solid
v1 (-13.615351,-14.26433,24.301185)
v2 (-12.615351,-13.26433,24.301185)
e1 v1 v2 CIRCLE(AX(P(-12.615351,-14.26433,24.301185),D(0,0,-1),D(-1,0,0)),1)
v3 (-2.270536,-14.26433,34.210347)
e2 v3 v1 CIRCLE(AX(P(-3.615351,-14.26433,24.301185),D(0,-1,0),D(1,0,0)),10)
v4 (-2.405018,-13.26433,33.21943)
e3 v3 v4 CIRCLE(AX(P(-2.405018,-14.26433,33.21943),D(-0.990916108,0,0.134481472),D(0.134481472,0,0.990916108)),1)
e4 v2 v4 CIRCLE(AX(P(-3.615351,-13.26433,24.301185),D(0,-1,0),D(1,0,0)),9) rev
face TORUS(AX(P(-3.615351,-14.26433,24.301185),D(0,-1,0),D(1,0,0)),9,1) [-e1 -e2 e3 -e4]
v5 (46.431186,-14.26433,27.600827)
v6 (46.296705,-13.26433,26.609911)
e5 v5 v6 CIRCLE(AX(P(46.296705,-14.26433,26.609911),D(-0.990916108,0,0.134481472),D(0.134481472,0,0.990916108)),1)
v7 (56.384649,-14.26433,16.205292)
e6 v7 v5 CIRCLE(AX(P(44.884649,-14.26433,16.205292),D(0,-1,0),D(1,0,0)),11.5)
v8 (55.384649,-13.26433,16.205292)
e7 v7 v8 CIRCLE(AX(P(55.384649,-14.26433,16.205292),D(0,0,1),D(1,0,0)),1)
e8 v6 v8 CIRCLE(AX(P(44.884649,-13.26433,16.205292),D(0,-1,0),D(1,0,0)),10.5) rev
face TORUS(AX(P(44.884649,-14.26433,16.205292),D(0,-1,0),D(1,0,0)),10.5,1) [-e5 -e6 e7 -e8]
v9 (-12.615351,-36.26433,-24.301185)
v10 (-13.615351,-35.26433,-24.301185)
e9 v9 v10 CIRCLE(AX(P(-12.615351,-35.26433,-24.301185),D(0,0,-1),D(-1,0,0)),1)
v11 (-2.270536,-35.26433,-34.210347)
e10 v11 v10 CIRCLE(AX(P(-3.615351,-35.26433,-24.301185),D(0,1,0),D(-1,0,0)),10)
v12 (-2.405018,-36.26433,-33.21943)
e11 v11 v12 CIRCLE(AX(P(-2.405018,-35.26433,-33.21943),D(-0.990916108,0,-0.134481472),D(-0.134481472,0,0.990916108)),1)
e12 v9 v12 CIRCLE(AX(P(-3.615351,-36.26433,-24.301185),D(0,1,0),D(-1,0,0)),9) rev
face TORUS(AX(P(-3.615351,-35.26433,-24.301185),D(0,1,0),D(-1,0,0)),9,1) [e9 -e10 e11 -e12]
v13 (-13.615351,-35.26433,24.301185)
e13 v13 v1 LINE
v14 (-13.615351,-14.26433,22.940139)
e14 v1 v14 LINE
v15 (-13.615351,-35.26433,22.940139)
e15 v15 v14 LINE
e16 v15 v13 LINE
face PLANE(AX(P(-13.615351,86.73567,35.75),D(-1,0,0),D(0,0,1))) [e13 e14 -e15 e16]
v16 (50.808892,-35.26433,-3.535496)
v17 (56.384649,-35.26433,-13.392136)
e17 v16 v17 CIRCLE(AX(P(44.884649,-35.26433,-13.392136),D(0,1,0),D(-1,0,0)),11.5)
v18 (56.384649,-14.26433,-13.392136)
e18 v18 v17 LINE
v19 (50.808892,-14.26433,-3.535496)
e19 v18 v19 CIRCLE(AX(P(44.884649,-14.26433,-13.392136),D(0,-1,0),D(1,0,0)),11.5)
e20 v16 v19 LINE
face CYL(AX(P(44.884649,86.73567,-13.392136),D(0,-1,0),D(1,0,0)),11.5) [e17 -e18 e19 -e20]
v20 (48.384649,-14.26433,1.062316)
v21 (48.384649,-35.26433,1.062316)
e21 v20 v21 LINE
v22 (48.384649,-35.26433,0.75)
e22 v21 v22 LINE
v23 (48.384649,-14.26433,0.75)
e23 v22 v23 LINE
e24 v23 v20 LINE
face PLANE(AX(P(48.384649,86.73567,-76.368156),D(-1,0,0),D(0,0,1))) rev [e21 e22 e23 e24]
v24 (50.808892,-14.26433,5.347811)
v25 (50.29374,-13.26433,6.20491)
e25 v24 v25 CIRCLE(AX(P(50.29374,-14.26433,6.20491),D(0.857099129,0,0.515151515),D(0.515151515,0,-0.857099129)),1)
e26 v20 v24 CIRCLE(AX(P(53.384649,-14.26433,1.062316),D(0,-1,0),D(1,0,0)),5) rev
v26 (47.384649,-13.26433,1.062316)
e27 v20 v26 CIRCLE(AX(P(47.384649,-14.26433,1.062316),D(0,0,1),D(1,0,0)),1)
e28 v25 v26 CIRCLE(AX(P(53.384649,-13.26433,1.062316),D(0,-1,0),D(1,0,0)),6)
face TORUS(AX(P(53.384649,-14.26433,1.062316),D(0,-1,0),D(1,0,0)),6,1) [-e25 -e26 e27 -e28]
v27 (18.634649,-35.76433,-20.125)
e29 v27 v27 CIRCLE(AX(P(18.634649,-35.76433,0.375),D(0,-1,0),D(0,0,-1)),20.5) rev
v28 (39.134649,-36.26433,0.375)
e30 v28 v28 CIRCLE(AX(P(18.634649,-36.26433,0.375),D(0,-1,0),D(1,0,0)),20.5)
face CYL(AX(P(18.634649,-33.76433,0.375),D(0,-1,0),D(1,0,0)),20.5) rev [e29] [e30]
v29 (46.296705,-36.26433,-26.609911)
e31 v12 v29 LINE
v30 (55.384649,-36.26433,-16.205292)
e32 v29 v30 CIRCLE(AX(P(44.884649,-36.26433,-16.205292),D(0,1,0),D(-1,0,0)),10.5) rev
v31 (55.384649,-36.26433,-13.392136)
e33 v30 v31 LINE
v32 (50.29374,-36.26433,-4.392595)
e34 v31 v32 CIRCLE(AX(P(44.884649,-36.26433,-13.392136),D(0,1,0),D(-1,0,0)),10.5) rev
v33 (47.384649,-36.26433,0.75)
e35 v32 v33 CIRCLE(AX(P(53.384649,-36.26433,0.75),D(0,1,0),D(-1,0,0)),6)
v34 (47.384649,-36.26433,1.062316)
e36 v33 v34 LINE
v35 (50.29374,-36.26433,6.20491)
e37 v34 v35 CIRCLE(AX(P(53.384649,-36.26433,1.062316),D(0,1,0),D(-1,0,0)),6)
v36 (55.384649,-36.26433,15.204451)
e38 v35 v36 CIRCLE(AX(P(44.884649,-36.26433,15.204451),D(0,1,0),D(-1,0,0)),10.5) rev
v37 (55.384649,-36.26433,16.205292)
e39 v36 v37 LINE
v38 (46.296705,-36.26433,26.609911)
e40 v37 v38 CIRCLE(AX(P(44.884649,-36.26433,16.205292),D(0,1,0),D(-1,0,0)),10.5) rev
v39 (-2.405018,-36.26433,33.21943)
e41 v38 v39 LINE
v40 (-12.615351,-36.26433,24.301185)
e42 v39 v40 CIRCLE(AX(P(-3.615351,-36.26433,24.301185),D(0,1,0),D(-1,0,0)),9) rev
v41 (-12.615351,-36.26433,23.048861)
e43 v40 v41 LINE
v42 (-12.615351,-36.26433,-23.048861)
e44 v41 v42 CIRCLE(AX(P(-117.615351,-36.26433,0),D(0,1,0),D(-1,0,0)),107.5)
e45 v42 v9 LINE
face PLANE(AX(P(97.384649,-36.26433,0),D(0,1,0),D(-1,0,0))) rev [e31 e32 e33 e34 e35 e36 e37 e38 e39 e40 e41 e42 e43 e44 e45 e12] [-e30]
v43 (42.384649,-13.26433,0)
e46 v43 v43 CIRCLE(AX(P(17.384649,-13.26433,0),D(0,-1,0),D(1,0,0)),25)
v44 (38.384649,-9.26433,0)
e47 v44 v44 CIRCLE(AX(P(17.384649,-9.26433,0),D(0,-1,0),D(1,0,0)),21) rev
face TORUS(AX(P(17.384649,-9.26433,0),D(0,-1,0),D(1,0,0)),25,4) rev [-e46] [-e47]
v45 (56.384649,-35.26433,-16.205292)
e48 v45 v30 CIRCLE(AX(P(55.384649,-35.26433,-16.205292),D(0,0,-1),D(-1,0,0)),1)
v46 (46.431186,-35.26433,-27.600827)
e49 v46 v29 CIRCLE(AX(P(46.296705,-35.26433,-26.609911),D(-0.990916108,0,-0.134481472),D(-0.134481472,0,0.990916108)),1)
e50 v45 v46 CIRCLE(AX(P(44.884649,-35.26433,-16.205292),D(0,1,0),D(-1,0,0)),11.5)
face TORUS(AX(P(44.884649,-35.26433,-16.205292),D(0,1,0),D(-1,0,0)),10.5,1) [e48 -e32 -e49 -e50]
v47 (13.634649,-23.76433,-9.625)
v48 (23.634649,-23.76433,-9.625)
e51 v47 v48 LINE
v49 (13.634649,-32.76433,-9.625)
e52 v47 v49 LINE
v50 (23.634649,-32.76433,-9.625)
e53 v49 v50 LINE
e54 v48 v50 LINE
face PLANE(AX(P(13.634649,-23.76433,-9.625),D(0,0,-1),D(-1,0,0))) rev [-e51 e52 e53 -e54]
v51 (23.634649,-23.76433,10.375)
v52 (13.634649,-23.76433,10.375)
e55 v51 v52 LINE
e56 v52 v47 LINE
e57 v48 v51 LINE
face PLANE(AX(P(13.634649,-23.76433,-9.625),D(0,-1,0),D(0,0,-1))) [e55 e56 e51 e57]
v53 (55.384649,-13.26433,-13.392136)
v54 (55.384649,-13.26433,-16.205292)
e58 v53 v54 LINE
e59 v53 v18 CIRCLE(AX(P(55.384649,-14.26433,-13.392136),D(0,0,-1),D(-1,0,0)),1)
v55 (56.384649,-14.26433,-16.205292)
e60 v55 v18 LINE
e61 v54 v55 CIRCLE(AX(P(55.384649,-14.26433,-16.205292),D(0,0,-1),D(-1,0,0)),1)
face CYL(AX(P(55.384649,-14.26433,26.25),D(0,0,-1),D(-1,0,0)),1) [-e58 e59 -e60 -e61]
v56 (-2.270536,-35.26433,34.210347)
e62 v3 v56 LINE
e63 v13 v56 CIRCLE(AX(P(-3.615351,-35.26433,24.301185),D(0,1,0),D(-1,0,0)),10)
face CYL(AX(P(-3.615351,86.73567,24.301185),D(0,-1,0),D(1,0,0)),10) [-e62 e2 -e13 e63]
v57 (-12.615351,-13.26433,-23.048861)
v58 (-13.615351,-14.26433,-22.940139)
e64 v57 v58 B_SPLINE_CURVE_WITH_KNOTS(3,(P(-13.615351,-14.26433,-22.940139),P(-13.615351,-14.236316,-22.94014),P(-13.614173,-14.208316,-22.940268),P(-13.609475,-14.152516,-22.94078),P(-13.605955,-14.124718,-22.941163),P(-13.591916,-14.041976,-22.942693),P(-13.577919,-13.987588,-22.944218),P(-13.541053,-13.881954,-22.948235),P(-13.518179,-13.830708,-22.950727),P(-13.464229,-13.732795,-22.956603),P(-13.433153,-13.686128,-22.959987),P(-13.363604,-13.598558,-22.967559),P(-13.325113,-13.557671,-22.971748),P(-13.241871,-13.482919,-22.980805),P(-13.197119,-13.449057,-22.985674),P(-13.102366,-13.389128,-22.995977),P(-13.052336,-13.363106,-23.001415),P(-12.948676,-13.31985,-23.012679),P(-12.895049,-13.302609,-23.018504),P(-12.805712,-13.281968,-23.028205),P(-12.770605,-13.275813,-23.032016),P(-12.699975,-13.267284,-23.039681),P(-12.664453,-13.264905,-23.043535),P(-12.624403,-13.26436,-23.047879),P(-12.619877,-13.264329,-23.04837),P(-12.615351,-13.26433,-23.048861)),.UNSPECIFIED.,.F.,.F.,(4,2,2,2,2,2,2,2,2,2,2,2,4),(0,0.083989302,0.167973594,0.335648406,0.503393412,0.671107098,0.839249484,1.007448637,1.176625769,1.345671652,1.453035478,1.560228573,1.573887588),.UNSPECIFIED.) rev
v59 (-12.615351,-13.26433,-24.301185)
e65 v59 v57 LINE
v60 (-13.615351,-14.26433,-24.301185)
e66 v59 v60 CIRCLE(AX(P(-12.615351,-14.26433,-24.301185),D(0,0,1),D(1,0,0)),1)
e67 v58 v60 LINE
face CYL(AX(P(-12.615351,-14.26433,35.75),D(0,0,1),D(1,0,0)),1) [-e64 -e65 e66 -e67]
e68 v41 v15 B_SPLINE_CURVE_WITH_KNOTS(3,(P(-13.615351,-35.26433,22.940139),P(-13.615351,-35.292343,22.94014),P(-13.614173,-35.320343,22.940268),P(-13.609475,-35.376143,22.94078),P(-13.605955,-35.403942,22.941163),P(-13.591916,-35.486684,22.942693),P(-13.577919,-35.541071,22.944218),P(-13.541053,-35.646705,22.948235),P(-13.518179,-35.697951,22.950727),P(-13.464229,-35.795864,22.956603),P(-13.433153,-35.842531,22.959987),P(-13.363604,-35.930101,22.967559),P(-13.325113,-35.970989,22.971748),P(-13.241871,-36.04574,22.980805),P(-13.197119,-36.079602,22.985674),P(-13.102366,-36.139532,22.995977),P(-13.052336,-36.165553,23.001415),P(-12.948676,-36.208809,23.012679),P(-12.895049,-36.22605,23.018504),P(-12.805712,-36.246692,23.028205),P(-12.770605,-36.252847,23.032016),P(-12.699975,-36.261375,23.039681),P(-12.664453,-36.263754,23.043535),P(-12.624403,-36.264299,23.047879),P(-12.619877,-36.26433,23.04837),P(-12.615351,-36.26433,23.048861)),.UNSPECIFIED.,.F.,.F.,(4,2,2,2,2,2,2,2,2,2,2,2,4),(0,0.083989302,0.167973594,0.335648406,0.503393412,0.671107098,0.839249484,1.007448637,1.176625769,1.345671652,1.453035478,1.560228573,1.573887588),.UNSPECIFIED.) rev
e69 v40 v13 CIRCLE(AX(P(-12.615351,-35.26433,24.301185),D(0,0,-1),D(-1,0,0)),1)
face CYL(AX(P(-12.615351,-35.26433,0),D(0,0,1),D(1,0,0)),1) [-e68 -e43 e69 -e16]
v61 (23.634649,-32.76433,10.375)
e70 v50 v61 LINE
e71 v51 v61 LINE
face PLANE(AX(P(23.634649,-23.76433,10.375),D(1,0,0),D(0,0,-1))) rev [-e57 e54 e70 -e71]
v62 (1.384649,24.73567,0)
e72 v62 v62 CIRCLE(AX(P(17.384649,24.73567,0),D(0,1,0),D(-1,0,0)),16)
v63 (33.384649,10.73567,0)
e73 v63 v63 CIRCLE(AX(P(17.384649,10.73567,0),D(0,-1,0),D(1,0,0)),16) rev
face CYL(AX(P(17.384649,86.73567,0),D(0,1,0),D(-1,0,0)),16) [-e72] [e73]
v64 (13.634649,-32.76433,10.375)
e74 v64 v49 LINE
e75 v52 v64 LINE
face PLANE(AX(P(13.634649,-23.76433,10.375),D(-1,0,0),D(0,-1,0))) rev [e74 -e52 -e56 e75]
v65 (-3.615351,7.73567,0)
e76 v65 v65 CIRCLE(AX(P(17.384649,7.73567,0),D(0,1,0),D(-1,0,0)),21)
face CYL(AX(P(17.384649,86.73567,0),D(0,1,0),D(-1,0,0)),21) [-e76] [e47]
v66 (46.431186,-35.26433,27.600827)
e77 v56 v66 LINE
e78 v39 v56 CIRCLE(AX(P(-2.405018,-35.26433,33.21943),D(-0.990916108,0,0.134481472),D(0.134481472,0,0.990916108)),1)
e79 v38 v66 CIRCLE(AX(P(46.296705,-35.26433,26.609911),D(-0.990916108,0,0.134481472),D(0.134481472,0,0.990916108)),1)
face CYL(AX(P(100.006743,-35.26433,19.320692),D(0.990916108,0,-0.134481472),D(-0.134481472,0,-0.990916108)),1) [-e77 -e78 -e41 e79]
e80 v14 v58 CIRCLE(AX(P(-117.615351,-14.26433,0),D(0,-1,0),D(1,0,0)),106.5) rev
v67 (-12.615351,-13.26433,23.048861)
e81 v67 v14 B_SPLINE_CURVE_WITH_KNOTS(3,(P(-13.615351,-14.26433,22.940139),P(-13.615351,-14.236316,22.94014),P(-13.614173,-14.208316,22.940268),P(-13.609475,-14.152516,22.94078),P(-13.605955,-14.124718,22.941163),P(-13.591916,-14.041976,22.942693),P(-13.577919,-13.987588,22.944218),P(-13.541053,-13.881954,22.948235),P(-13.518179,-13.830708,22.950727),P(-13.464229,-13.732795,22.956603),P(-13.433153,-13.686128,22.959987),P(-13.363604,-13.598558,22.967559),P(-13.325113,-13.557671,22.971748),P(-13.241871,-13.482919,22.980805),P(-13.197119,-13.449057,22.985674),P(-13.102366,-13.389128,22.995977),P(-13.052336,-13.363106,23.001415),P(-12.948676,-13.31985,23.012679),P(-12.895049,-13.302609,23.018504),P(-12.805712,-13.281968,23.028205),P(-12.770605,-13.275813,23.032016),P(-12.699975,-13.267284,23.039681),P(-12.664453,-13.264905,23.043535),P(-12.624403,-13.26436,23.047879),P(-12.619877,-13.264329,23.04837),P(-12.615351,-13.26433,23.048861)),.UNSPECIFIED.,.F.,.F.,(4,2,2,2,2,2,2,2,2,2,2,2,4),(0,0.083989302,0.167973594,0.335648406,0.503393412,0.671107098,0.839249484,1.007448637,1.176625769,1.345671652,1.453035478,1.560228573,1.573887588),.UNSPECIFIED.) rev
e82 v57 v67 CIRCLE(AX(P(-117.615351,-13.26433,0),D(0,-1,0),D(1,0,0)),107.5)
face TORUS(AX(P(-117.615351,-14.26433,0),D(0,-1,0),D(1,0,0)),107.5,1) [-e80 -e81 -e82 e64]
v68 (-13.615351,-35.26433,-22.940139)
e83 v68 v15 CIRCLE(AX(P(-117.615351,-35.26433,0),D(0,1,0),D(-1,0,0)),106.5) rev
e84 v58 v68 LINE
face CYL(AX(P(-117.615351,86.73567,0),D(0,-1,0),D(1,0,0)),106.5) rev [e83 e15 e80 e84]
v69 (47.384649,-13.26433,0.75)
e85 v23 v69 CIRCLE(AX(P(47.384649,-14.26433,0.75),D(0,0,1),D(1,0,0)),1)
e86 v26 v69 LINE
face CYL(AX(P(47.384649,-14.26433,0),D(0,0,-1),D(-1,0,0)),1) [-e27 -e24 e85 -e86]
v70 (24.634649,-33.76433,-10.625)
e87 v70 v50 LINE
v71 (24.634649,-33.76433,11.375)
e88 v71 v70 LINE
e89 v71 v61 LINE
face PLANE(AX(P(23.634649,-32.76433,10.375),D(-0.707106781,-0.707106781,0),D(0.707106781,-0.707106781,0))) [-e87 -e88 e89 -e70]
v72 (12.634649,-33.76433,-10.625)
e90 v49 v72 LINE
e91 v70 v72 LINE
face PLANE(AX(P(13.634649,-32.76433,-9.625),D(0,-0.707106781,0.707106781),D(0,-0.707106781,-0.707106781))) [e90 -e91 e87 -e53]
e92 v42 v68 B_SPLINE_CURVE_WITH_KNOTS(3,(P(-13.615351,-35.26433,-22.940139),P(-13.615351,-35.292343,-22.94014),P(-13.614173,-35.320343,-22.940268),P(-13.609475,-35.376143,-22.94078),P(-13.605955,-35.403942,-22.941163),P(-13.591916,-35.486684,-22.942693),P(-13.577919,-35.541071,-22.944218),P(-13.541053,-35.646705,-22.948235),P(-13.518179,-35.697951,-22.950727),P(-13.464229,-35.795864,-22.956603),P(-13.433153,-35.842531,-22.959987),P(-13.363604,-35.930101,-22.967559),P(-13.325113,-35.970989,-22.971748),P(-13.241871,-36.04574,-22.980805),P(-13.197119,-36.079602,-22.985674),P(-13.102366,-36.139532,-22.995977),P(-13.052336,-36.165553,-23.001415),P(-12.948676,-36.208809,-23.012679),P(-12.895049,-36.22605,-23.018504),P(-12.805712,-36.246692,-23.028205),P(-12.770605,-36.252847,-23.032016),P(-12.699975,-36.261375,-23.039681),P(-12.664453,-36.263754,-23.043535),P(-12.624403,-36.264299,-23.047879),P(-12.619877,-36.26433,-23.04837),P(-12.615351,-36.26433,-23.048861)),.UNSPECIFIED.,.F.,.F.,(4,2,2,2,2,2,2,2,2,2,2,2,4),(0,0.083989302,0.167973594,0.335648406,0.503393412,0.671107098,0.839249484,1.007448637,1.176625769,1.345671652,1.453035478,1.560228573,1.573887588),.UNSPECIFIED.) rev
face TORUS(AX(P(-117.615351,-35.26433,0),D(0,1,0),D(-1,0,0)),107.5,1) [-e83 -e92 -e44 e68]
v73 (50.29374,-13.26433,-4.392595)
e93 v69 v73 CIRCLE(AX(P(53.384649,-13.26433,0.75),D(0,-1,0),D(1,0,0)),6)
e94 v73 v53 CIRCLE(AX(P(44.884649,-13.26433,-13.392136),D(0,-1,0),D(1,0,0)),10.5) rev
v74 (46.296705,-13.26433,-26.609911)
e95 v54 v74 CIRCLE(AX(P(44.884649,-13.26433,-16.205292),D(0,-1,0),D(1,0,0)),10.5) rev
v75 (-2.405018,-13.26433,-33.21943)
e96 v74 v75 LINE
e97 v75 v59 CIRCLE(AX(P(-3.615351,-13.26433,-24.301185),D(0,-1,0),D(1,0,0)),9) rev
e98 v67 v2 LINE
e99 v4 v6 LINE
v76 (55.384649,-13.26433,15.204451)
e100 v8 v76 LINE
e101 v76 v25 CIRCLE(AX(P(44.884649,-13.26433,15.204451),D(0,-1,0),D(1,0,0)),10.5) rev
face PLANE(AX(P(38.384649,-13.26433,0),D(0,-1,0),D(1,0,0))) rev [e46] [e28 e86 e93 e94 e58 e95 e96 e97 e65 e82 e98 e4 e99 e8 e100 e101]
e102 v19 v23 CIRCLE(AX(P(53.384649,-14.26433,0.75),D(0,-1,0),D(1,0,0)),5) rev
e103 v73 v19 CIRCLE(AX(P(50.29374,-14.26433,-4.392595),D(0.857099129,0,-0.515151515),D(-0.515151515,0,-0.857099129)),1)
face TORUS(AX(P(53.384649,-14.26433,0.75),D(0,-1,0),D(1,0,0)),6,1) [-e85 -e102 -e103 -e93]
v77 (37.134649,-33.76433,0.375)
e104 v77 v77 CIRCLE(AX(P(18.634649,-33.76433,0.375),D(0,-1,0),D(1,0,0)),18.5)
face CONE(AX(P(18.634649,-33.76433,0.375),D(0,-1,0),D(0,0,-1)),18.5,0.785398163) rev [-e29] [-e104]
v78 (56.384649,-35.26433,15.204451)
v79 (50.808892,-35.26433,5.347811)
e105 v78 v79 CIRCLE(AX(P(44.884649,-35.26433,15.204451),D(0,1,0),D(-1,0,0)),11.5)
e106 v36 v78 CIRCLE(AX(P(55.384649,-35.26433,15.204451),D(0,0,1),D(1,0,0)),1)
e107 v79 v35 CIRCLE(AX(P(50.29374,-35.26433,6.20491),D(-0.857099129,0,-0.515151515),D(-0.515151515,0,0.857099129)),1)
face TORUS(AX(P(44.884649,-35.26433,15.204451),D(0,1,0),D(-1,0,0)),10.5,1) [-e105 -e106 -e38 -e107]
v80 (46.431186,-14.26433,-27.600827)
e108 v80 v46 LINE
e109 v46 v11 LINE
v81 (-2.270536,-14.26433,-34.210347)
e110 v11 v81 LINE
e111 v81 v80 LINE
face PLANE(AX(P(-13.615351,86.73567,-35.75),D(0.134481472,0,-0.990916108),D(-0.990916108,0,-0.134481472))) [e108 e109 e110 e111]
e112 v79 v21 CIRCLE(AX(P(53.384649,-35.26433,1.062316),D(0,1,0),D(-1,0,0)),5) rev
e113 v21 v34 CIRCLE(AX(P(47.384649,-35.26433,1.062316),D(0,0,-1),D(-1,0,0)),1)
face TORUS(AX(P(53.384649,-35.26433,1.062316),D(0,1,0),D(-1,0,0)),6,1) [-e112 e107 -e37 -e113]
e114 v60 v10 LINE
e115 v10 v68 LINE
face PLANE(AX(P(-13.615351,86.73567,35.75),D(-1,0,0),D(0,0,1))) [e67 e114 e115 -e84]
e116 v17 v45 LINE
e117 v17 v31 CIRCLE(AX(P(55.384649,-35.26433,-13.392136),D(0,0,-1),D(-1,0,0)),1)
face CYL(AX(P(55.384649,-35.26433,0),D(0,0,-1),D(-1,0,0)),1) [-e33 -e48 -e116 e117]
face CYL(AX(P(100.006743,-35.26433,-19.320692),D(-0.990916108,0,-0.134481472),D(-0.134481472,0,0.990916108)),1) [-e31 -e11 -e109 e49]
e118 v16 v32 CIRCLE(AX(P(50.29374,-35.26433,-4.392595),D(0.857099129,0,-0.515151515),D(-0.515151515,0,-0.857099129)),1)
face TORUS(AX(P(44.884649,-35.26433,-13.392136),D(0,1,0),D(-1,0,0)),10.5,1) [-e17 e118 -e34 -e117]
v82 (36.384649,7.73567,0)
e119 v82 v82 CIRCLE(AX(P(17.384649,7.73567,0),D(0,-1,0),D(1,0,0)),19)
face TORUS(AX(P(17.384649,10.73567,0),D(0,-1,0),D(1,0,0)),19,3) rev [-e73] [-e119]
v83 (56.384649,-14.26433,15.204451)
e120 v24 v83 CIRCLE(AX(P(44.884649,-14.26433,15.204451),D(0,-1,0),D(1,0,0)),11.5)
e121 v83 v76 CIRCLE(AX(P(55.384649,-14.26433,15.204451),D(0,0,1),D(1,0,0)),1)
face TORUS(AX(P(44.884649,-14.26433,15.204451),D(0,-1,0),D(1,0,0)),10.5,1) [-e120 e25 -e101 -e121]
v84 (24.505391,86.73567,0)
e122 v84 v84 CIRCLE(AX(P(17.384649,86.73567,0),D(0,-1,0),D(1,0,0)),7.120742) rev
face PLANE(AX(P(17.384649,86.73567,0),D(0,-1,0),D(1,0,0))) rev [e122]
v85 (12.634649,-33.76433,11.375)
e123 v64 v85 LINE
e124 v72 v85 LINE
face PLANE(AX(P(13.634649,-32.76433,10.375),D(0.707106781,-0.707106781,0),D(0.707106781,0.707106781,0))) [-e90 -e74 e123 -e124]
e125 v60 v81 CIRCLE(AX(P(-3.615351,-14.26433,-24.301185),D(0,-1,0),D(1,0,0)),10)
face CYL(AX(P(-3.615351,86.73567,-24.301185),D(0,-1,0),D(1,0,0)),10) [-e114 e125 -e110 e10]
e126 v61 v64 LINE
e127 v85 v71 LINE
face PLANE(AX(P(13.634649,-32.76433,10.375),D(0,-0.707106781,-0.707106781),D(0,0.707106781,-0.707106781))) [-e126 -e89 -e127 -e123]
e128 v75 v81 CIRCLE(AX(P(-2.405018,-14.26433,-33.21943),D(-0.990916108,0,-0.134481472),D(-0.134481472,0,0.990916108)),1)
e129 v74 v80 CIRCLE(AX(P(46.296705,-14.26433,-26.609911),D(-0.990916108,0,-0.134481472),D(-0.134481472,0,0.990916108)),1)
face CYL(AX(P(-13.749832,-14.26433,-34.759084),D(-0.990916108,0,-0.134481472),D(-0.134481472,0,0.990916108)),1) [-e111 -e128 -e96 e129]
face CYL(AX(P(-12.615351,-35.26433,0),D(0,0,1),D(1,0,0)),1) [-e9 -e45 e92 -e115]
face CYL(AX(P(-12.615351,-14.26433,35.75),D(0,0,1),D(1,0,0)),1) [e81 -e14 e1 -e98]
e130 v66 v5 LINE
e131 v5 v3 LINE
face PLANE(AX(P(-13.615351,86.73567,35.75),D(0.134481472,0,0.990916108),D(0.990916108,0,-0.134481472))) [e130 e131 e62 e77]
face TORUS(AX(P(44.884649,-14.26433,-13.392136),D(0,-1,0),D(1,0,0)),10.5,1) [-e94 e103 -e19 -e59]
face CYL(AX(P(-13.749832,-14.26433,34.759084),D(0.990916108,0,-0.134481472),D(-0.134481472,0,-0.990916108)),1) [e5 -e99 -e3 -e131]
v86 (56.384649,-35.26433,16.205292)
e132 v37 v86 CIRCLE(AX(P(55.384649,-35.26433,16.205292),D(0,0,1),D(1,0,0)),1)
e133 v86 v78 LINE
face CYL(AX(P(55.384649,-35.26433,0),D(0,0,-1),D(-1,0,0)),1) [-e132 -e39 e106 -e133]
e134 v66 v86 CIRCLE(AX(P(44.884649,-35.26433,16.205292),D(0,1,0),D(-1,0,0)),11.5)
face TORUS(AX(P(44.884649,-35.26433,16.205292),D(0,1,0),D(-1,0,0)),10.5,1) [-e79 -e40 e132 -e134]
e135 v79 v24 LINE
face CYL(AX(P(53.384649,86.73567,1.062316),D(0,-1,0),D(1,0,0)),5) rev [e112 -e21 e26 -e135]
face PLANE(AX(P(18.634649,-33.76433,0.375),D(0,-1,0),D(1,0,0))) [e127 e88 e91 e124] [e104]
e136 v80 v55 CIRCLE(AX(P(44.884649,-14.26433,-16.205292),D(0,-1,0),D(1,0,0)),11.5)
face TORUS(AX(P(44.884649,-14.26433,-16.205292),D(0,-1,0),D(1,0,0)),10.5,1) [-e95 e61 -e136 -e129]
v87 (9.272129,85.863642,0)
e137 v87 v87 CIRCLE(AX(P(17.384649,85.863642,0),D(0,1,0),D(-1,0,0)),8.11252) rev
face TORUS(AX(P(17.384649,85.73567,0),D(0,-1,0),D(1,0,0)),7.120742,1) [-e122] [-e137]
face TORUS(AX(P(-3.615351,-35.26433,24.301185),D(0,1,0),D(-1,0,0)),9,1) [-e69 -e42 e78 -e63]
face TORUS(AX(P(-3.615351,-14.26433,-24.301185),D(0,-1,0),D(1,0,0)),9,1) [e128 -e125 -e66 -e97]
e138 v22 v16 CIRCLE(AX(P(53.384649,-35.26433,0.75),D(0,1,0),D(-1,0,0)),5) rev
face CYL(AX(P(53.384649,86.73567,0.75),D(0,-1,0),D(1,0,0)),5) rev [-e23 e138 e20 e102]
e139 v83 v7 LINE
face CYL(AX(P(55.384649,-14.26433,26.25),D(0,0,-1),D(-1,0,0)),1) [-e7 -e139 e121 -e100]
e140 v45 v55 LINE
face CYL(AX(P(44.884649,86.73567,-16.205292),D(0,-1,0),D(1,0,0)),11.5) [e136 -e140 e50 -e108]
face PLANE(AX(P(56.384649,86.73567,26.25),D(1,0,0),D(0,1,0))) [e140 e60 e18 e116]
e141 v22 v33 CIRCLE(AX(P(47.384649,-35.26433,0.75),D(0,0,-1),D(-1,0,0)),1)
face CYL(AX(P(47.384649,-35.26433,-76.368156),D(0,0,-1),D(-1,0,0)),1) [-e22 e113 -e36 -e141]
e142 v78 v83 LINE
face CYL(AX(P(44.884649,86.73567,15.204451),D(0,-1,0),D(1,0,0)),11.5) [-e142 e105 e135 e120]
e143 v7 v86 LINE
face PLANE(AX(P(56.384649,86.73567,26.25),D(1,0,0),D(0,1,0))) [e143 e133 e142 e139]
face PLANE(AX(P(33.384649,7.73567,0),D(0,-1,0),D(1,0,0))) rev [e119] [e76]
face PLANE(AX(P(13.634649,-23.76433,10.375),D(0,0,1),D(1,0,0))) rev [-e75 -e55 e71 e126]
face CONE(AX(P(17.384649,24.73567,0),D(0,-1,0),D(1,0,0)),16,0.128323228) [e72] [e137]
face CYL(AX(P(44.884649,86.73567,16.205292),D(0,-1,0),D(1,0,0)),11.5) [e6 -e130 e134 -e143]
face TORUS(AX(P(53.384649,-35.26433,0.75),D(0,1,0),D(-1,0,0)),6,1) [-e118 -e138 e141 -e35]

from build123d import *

# Parameters (mm, degrees)
ESBO_O2_OUTSIDE_W     = 213.508
ESBO_O2_OUTSIDE_H     = 213.508
CORTE_EXTRUS_O2_DEPTH = 177.104428981
ESBO_O3_R             = 106.5
CORTE_EXTRUS_O3_DEPTH = 140.951031327
FILETE1_R             = 10
ESBO_O4_W             = 8
ESBO_O4_H             = 4.25
CORTE_EXTRUS_O4_DEPTH = 140.587965081
FILETE2_R             = 11.5
FILETE3_R             = 11.5
FILETE4_R             = 5
FILETE5_R             = 5
FILETE6_R             = 11.5
FILETE7_R             = 4
FILETE8_R             = 3
FILETE9_R             = 1
FILETE10_R            = 1
ESBO_O5_R             = 20.5
CORTE_EXTRUS_O6_DEPTH = 2.5
CHANFRO1_SIZE         = 2
ESBO_O6_W             = 10
ESBO_O6_H             = 20
CORTE_EXTRUS_O7_DEPTH = 10
CHANFRO2_SIZE         = 1


with BuildPart() as part:
    # Esboço1 → Revolução1 (revolve)
    with BuildSketch(Plane.XY, mode=Mode.PRIVATE) as revolu_o1_sk:
        Polygon((17.384649235, 86.73567042), (25.384649235, 86.73567042), (33.384649235, 24.73567042), (33.384649235, 7.73567042), (38.384649235, 7.73567042), (38.384649235, -13.26432958), (97.384649235, -13.26432958), (97.384649235, -36.26432958), (17.384649235, -36.26432958), align=None)
    revolve(revolu_o1_sk.sketch.rotate(Axis((17.384649235, 86.73567042, 0), (0, -1, 0)), 180), axis=Axis((17.384649235, 86.73567042, 0), (0, -1, 0)))

    # Esboço2 outside → Corte-extrusão2 (cut, through all)
    with BuildSketch(Plane.XZ.offset(36.26432958)):
        with Locations((17.385, 0)):
            Rectangle(ESBO_O2_OUTSIDE_W, ESBO_O2_OUTSIDE_H)
        Polygon((56.384649235, 26.25), (56.384649235, -26.25), (-13.615350765, -35.75), (-13.615350765, 35.75), align=None, mode=Mode.SUBTRACT)
    extrude(amount=-CORTE_EXTRUS_O2_DEPTH, mode=Mode.SUBTRACT)

    # Esboço3 → Corte-extrusão3 (cut, through all)
    with BuildSketch(Plane.XZ.offset(36.26432958)):
        with Locations((-117.615350765, 0)):
            Circle(ESBO_O3_R)
    extrude(amount=-CORTE_EXTRUS_O3_DEPTH, mode=Mode.SUBTRACT)

    # Filete1
    filete1_edges = [part.edges().sort_by_distance(p)[0] for p in [
        (-13.615350765, -24.76432958, -35.75),
        (-13.615350765, -24.76432958, 35.75),
    ]]
    fillet(filete1_edges, radius=FILETE1_R)

    # Esboço4 → Corte-extrusão4 (cut, through all)
    with BuildSketch(Plane.XZ.offset(36.26432958)):
        with Locations((52.384649235, 2.125)):
            Rectangle(ESBO_O4_W, ESBO_O4_H)
        with Locations((52.384649235, -2.125)):
            Rectangle(ESBO_O4_W, ESBO_O4_H)
    extrude(amount=-CORTE_EXTRUS_O4_DEPTH, mode=Mode.SUBTRACT)

    # Filete2
    filete2_edges = [part.edges().sort_by_distance(p)[0] for p in [
        (56.384649235, -24.76432958, 26.25),
    ]]
    fillet(filete2_edges, radius=FILETE2_R)

    # Filete3
    # the kernel refuses this fillet: 11.5 mm, written as the material it takes off along each edge
    with BuildSketch(Plane(origin=(56.384649235, -63.650457456, 4.25), x_dir=(0, 0, 1), z_dir=(0, 1, 0))) as filete3_piece_1:
        with BuildLine():
            CenterArc((10.95445115, -11.5), FILETE3_R, 90, 72.281068127)
            Line((0, -8), (-0.219089023, -7.93))
            ThreePointArc((-0.219089023, -7.93), (-0.23, -4), (-0.23, 0))
            Line((-0.23, 0), (0, 0.23))
            Line((0, 0.23), (10.95445115, 0.23))
            Line((10.95445115, 0.23), (10.95445115, 0))
        make_face()
    extrude(amount=77.772255751, mode=Mode.SUBTRACT)

    # Filete4
    filete4_edges = [part.edges().sort_by_distance(p)[0] for p in [
        (48.384649235, -24.76432958, 4.25),
    ]]
    fillet(filete4_edges, radius=FILETE4_R)

    # Filete5
    filete5_edges = [part.edges().sort_by_distance(p)[0] for p in [
        (48.384649235, -24.76432958, -4.25),
    ]]
    fillet(filete5_edges, radius=FILETE5_R)

    # Filete6
    filete6_edges = [part.edges().sort_by_distance(p)[0] for p in [
        (56.384649235, -24.76432958, -26.25),
        (56.384649235, -24.76432958, -4.25),
    ]]
    fillet(filete6_edges, radius=FILETE6_R)

    # Filete7
    filete7_edges = [part.edges().sort_by_distance(p)[0] for p in [
        (38.384649235, -13.26432958, 0),
    ]]
    fillet(filete7_edges, radius=FILETE7_R)

    # Filete8
    filete8_edges = [part.edges().sort_by_distance(p)[0] for p in [
        (33.384649235, 7.73567042, 0),
    ]]
    fillet(filete8_edges, radius=FILETE8_R)

    # Filete9
    filete9_edges = [part.edges().sort_by_distance(p)[0] for p in [
        (49.032707836, -13.26432958, 3.524145346),
        (49.032707836, -13.26432958, -1.71182982),
        (56.384649235, -13.26432958, -14.798713755),
        (54.894114452, -13.26432958, -7.729927039),
        (53.545918618, -13.26432958, -23.770502568),
        (-13.615350765, -13.26432958, -23.620662492),
        (-11.115350765, -13.26432958, 0),
        (22.080325057, -13.26432958, -30.905586853),
        (-13.615350765, -13.26432958, 23.620662492),
        (-10.193794837, -13.26432958, 31.832724085),
        (-10.193794837, -13.26432958, -31.832724085),
        (22.080325057, -13.26432958, 30.905586853),
        (53.545918618, -13.26432958, 23.770502568),
        (56.384649235, -13.26432958, 15.704871518),
        (54.894114452, -13.26432958, 9.542242565),
        (25.384649235, 86.73567042, 0),
        (48.384649235, -13.26432958, 0.906157763),
    ]]
    fillet(filete9_edges, radius=FILETE9_R)

    # Filete10
    filete10_edges = [part.edges().sort_by_distance(p)[0] for p in [
        (54.894114452, -36.26432958, 9.542242565),
        (49.032707836, -36.26432958, 3.524145346),
        (56.384649235, -36.26432958, -14.798713755),
        (49.032707836, -36.26432958, -1.71182982),
        (54.894114452, -36.26432958, -7.729927039),
        (53.545918618, -36.26432958, -23.770502568),
        (-13.615350765, -36.26432958, -23.620662492),
        (-11.115350765, -36.26432958, 0),
        (-13.615350765, -36.26432958, 23.620662492),
        (22.080325057, -36.26432958, -30.905586853),
        (-10.193794837, -36.26432958, 31.832724085),
        (-10.193794837, -36.26432958, -31.832724085),
        (22.080325057, -36.26432958, 30.905586853),
        (53.545918618, -36.26432958, 23.770502568),
        (56.384649235, -36.26432958, 15.704871518),
        (48.384649235, -36.26432958, 0.906157763),
    ]]
    fillet(filete10_edges, radius=FILETE10_R)

    # Esboço5 → Corte-extrusão6 (cut)
    with BuildSketch(Plane.XZ.offset(36.26432958)):
        with Locations((18.634649235, 0.375)):
            Circle(ESBO_O5_R)
    extrude(amount=-CORTE_EXTRUS_O6_DEPTH, mode=Mode.SUBTRACT)

    # Chanfro1
    chanfro1_edges = [part.edges().sort_by_distance(p)[0] for p in [
        (-1.865350765, -33.76432958, 0.375),
    ]]
    chamfer(chanfro1_edges, length=CHANFRO1_SIZE)

    # Esboço6 → Corte-extrusão7 (cut)
    with BuildSketch(Plane.XZ.offset(33.76432958)):
        with Locations((18.634649235, 0.375)):
            Rectangle(ESBO_O6_W, ESBO_O6_H)
    extrude(amount=-CORTE_EXTRUS_O7_DEPTH, mode=Mode.SUBTRACT)

    # Chanfro2
    chanfro2_edges = [part.edges().sort_by_distance(p)[0] for p in [
        (13.634649235, -33.76432958, 0.375),
        (18.634649235, -33.76432958, -9.625),
        (23.634649235, -33.76432958, 0.375),
        (18.634649235, -33.76432958, 10.375),
    ]]
    chamfer(chanfro2_edges, length=CHANFRO2_SIZE)


solid = part.part
